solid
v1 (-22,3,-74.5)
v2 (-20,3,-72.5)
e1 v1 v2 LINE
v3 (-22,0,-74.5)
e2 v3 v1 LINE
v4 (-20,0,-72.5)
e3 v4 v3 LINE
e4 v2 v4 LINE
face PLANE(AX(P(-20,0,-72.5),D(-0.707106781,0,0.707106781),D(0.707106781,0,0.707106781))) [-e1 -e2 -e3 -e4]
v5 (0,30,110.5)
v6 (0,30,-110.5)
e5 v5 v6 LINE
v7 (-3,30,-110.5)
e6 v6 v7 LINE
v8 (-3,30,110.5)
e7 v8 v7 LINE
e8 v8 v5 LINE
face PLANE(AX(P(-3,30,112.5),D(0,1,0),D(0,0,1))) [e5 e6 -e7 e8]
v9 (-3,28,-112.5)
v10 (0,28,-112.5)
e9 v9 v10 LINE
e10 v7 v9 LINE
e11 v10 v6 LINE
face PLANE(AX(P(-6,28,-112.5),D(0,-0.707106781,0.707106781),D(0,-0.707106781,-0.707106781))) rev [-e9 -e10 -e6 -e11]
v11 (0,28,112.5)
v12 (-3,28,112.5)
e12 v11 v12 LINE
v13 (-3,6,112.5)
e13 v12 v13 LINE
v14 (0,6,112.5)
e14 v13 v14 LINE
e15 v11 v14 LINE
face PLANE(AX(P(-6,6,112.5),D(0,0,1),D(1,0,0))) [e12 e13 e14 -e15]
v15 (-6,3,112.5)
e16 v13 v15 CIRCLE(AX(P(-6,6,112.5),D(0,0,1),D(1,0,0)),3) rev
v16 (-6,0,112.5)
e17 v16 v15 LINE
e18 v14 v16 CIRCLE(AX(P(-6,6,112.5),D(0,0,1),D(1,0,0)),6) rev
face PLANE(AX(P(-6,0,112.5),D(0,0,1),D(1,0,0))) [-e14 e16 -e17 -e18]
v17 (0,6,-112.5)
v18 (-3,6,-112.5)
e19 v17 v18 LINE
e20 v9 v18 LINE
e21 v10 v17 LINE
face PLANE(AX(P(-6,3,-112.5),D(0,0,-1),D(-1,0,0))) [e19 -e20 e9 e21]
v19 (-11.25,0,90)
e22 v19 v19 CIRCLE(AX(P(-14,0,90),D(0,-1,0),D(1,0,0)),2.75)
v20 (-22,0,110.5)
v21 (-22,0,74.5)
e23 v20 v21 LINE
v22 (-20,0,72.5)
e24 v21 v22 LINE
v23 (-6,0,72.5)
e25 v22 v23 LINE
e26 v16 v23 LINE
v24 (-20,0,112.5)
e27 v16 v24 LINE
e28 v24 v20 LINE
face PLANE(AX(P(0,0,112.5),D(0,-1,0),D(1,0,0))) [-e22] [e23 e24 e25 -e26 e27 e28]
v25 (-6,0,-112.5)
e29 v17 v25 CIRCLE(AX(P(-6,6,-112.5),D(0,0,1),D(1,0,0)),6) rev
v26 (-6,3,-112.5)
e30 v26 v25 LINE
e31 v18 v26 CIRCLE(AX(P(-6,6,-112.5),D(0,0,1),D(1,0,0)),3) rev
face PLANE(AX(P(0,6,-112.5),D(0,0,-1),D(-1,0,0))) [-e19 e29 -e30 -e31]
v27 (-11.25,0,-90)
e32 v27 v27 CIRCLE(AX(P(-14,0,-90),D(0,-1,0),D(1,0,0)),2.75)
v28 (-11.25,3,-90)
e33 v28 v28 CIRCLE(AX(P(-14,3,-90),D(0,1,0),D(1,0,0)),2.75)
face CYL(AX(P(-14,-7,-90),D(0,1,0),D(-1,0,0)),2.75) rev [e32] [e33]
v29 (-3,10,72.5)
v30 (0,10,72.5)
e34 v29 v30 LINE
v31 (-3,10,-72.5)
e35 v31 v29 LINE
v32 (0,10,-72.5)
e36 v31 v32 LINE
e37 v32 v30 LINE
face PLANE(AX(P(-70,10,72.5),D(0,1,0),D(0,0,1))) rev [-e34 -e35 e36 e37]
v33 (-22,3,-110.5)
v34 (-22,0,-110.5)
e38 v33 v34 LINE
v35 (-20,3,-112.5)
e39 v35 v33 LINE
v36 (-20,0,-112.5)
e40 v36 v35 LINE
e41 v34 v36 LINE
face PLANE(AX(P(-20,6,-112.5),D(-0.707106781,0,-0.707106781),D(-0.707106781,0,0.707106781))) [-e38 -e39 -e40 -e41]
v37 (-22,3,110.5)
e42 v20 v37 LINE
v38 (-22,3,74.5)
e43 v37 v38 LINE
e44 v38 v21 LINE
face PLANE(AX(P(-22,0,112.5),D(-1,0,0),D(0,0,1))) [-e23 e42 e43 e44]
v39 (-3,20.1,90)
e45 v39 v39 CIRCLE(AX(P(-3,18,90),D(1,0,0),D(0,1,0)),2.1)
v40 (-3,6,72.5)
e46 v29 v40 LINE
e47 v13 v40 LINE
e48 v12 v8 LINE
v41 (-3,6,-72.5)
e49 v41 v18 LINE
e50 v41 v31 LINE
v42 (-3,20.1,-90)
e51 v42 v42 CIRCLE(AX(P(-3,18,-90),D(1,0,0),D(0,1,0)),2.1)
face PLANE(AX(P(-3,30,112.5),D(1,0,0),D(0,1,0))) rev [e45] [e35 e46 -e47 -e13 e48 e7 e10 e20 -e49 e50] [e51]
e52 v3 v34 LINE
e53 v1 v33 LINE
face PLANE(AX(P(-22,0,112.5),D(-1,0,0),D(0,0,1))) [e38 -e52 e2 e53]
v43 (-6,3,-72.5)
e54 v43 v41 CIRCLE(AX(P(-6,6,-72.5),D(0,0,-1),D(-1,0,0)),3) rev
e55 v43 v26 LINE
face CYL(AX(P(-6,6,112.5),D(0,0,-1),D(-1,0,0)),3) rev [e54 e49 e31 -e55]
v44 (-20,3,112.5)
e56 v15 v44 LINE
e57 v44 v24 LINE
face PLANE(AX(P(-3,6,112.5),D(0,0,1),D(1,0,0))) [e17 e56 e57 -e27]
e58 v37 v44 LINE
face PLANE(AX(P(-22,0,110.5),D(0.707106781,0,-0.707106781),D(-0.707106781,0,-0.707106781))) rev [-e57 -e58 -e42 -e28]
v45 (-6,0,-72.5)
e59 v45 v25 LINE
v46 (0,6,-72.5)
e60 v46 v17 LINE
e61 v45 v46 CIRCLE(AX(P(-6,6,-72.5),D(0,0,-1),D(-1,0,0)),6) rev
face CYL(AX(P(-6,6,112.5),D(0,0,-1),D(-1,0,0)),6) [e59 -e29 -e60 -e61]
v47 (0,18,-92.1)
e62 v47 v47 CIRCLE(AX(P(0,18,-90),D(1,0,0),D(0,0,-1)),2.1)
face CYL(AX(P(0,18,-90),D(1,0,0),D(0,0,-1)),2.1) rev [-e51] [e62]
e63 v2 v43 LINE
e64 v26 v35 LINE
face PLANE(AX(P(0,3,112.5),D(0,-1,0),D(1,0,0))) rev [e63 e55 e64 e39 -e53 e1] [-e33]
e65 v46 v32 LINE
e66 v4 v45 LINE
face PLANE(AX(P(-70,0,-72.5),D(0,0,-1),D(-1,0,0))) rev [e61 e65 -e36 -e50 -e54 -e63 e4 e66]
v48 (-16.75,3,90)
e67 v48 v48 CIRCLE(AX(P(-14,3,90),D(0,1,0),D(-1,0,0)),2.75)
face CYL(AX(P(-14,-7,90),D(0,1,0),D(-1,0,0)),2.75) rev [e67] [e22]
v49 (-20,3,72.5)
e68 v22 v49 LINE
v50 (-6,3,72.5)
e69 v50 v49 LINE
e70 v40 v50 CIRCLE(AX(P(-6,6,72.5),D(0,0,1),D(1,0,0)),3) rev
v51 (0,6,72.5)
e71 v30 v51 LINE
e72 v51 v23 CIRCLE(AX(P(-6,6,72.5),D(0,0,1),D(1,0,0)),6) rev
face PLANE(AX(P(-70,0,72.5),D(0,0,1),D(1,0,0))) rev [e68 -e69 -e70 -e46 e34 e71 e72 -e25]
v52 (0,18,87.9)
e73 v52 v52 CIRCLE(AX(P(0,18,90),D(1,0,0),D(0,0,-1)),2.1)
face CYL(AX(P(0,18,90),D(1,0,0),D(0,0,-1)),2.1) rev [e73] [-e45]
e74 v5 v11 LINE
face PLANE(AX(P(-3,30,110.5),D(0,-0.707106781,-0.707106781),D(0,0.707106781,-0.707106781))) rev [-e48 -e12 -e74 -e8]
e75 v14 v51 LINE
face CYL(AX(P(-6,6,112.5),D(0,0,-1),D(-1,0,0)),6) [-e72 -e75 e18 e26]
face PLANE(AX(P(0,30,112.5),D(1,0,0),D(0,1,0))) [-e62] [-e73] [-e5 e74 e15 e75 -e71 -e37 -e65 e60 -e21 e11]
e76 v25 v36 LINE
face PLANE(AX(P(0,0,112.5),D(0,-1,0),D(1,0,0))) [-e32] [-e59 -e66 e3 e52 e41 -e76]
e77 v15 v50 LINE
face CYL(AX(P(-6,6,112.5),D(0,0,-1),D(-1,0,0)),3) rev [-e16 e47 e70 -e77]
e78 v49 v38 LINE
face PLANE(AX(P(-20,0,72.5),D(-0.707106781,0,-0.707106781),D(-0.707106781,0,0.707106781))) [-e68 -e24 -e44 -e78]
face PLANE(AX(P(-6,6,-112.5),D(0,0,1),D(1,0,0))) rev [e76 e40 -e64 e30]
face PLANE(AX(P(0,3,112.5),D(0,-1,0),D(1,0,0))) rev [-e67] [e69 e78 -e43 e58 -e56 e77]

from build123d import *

# Parameters (mm, degrees)
BASE_FLANGE1_DEPTH    = 112.5
SKETCH4_R             = 2.75
CUT_EXTRUDE1_DEPTH    = 10
SKETCH5_W             = 145
SKETCH5_H             = 10
CUT_EXTRUDE2_DEPTH    = 70
CHAMFER1_SIZE         = 2
M5_TAPPED_HOLE1_D     = 4.2
M5_TAPPED_HOLE1_DEPTH = 12.4
M5_TAPPED_HOLE1_TIP   = 1.2618073


# Sheet-metal steps are written as plain solids
with BuildPart() as part:
    # Sketch1 → Base-Flange1 (new, symmetric)
    with BuildSketch(Plane.XY):
        with BuildLine():
            Line((0, 30), (0, 6))
            ThreePointArc((0, 6), (-1.757359313, 1.757359313), (-6, 0))
            Line((-6, 0), (-22, 0))
            Line((-22, 0), (-22, 3))
            Line((-22, 3), (-6, 3))
            ThreePointArc((-6, 3), (-3.878679656, 3.878679656), (-3, 6))
            Line((-3, 6), (-3, 30))
            Line((-3, 30), (0, 30))
        make_face()
    extrude(amount=BASE_FLANGE1_DEPTH, both=True)

    # Sketch4 → Cut-Extrude1 (cut)
    with BuildSketch(Plane(origin=(0, 3, 0), x_dir=(1, 0, 0), z_dir=(0, 1, 0))):
        with Locations(Location((-14, -90, 0), (0, 0, 180))):
            Circle(SKETCH4_R)
        with Locations((-14, 90)):
            Circle(SKETCH4_R)
    extrude(amount=-CUT_EXTRUDE1_DEPTH, mode=Mode.SUBTRACT)

    # Sketch5 → Cut-Extrude2 (cut)
    with BuildSketch(Plane(origin=(0, 0, 0), x_dir=(0, 0, -1), z_dir=(1, 0, 0))):
        with Locations((0, 5)):
            Rectangle(SKETCH5_W, SKETCH5_H)
    extrude(amount=-CUT_EXTRUDE2_DEPTH, mode=Mode.SUBTRACT)

    # Chamfer1
    chamfer1_edges = [part.edges().sort_by_distance(p)[0] for p in [
        (-1.5, 30, 112.5),
        (-22, 1.5, 72.5),
        (-22, 1.5, -72.5),
        (-22, 1.5, 112.5),
        (-1.5, 30, -112.5),
        (-22, 1.5, -112.5),
    ]]
    chamfer(chamfer1_edges, length=CHAMFER1_SIZE)

    # M5 Tapped Hole1
    with Locations(Plane(origin=(0, 18, 90), x_dir=(0, 0, 1), z_dir=(1, 0, 0))):
        with Locations((0, 0), (-180, 0)):
            Hole(M5_TAPPED_HOLE1_D / 2, depth=M5_TAPPED_HOLE1_DEPTH)
            with Locations((0, 0, -(M5_TAPPED_HOLE1_DEPTH + M5_TAPPED_HOLE1_TIP / 2))):  # 118° drill point
                Cone(0, M5_TAPPED_HOLE1_D / 2, M5_TAPPED_HOLE1_TIP, mode=Mode.SUBTRACT)


solid = part.part
